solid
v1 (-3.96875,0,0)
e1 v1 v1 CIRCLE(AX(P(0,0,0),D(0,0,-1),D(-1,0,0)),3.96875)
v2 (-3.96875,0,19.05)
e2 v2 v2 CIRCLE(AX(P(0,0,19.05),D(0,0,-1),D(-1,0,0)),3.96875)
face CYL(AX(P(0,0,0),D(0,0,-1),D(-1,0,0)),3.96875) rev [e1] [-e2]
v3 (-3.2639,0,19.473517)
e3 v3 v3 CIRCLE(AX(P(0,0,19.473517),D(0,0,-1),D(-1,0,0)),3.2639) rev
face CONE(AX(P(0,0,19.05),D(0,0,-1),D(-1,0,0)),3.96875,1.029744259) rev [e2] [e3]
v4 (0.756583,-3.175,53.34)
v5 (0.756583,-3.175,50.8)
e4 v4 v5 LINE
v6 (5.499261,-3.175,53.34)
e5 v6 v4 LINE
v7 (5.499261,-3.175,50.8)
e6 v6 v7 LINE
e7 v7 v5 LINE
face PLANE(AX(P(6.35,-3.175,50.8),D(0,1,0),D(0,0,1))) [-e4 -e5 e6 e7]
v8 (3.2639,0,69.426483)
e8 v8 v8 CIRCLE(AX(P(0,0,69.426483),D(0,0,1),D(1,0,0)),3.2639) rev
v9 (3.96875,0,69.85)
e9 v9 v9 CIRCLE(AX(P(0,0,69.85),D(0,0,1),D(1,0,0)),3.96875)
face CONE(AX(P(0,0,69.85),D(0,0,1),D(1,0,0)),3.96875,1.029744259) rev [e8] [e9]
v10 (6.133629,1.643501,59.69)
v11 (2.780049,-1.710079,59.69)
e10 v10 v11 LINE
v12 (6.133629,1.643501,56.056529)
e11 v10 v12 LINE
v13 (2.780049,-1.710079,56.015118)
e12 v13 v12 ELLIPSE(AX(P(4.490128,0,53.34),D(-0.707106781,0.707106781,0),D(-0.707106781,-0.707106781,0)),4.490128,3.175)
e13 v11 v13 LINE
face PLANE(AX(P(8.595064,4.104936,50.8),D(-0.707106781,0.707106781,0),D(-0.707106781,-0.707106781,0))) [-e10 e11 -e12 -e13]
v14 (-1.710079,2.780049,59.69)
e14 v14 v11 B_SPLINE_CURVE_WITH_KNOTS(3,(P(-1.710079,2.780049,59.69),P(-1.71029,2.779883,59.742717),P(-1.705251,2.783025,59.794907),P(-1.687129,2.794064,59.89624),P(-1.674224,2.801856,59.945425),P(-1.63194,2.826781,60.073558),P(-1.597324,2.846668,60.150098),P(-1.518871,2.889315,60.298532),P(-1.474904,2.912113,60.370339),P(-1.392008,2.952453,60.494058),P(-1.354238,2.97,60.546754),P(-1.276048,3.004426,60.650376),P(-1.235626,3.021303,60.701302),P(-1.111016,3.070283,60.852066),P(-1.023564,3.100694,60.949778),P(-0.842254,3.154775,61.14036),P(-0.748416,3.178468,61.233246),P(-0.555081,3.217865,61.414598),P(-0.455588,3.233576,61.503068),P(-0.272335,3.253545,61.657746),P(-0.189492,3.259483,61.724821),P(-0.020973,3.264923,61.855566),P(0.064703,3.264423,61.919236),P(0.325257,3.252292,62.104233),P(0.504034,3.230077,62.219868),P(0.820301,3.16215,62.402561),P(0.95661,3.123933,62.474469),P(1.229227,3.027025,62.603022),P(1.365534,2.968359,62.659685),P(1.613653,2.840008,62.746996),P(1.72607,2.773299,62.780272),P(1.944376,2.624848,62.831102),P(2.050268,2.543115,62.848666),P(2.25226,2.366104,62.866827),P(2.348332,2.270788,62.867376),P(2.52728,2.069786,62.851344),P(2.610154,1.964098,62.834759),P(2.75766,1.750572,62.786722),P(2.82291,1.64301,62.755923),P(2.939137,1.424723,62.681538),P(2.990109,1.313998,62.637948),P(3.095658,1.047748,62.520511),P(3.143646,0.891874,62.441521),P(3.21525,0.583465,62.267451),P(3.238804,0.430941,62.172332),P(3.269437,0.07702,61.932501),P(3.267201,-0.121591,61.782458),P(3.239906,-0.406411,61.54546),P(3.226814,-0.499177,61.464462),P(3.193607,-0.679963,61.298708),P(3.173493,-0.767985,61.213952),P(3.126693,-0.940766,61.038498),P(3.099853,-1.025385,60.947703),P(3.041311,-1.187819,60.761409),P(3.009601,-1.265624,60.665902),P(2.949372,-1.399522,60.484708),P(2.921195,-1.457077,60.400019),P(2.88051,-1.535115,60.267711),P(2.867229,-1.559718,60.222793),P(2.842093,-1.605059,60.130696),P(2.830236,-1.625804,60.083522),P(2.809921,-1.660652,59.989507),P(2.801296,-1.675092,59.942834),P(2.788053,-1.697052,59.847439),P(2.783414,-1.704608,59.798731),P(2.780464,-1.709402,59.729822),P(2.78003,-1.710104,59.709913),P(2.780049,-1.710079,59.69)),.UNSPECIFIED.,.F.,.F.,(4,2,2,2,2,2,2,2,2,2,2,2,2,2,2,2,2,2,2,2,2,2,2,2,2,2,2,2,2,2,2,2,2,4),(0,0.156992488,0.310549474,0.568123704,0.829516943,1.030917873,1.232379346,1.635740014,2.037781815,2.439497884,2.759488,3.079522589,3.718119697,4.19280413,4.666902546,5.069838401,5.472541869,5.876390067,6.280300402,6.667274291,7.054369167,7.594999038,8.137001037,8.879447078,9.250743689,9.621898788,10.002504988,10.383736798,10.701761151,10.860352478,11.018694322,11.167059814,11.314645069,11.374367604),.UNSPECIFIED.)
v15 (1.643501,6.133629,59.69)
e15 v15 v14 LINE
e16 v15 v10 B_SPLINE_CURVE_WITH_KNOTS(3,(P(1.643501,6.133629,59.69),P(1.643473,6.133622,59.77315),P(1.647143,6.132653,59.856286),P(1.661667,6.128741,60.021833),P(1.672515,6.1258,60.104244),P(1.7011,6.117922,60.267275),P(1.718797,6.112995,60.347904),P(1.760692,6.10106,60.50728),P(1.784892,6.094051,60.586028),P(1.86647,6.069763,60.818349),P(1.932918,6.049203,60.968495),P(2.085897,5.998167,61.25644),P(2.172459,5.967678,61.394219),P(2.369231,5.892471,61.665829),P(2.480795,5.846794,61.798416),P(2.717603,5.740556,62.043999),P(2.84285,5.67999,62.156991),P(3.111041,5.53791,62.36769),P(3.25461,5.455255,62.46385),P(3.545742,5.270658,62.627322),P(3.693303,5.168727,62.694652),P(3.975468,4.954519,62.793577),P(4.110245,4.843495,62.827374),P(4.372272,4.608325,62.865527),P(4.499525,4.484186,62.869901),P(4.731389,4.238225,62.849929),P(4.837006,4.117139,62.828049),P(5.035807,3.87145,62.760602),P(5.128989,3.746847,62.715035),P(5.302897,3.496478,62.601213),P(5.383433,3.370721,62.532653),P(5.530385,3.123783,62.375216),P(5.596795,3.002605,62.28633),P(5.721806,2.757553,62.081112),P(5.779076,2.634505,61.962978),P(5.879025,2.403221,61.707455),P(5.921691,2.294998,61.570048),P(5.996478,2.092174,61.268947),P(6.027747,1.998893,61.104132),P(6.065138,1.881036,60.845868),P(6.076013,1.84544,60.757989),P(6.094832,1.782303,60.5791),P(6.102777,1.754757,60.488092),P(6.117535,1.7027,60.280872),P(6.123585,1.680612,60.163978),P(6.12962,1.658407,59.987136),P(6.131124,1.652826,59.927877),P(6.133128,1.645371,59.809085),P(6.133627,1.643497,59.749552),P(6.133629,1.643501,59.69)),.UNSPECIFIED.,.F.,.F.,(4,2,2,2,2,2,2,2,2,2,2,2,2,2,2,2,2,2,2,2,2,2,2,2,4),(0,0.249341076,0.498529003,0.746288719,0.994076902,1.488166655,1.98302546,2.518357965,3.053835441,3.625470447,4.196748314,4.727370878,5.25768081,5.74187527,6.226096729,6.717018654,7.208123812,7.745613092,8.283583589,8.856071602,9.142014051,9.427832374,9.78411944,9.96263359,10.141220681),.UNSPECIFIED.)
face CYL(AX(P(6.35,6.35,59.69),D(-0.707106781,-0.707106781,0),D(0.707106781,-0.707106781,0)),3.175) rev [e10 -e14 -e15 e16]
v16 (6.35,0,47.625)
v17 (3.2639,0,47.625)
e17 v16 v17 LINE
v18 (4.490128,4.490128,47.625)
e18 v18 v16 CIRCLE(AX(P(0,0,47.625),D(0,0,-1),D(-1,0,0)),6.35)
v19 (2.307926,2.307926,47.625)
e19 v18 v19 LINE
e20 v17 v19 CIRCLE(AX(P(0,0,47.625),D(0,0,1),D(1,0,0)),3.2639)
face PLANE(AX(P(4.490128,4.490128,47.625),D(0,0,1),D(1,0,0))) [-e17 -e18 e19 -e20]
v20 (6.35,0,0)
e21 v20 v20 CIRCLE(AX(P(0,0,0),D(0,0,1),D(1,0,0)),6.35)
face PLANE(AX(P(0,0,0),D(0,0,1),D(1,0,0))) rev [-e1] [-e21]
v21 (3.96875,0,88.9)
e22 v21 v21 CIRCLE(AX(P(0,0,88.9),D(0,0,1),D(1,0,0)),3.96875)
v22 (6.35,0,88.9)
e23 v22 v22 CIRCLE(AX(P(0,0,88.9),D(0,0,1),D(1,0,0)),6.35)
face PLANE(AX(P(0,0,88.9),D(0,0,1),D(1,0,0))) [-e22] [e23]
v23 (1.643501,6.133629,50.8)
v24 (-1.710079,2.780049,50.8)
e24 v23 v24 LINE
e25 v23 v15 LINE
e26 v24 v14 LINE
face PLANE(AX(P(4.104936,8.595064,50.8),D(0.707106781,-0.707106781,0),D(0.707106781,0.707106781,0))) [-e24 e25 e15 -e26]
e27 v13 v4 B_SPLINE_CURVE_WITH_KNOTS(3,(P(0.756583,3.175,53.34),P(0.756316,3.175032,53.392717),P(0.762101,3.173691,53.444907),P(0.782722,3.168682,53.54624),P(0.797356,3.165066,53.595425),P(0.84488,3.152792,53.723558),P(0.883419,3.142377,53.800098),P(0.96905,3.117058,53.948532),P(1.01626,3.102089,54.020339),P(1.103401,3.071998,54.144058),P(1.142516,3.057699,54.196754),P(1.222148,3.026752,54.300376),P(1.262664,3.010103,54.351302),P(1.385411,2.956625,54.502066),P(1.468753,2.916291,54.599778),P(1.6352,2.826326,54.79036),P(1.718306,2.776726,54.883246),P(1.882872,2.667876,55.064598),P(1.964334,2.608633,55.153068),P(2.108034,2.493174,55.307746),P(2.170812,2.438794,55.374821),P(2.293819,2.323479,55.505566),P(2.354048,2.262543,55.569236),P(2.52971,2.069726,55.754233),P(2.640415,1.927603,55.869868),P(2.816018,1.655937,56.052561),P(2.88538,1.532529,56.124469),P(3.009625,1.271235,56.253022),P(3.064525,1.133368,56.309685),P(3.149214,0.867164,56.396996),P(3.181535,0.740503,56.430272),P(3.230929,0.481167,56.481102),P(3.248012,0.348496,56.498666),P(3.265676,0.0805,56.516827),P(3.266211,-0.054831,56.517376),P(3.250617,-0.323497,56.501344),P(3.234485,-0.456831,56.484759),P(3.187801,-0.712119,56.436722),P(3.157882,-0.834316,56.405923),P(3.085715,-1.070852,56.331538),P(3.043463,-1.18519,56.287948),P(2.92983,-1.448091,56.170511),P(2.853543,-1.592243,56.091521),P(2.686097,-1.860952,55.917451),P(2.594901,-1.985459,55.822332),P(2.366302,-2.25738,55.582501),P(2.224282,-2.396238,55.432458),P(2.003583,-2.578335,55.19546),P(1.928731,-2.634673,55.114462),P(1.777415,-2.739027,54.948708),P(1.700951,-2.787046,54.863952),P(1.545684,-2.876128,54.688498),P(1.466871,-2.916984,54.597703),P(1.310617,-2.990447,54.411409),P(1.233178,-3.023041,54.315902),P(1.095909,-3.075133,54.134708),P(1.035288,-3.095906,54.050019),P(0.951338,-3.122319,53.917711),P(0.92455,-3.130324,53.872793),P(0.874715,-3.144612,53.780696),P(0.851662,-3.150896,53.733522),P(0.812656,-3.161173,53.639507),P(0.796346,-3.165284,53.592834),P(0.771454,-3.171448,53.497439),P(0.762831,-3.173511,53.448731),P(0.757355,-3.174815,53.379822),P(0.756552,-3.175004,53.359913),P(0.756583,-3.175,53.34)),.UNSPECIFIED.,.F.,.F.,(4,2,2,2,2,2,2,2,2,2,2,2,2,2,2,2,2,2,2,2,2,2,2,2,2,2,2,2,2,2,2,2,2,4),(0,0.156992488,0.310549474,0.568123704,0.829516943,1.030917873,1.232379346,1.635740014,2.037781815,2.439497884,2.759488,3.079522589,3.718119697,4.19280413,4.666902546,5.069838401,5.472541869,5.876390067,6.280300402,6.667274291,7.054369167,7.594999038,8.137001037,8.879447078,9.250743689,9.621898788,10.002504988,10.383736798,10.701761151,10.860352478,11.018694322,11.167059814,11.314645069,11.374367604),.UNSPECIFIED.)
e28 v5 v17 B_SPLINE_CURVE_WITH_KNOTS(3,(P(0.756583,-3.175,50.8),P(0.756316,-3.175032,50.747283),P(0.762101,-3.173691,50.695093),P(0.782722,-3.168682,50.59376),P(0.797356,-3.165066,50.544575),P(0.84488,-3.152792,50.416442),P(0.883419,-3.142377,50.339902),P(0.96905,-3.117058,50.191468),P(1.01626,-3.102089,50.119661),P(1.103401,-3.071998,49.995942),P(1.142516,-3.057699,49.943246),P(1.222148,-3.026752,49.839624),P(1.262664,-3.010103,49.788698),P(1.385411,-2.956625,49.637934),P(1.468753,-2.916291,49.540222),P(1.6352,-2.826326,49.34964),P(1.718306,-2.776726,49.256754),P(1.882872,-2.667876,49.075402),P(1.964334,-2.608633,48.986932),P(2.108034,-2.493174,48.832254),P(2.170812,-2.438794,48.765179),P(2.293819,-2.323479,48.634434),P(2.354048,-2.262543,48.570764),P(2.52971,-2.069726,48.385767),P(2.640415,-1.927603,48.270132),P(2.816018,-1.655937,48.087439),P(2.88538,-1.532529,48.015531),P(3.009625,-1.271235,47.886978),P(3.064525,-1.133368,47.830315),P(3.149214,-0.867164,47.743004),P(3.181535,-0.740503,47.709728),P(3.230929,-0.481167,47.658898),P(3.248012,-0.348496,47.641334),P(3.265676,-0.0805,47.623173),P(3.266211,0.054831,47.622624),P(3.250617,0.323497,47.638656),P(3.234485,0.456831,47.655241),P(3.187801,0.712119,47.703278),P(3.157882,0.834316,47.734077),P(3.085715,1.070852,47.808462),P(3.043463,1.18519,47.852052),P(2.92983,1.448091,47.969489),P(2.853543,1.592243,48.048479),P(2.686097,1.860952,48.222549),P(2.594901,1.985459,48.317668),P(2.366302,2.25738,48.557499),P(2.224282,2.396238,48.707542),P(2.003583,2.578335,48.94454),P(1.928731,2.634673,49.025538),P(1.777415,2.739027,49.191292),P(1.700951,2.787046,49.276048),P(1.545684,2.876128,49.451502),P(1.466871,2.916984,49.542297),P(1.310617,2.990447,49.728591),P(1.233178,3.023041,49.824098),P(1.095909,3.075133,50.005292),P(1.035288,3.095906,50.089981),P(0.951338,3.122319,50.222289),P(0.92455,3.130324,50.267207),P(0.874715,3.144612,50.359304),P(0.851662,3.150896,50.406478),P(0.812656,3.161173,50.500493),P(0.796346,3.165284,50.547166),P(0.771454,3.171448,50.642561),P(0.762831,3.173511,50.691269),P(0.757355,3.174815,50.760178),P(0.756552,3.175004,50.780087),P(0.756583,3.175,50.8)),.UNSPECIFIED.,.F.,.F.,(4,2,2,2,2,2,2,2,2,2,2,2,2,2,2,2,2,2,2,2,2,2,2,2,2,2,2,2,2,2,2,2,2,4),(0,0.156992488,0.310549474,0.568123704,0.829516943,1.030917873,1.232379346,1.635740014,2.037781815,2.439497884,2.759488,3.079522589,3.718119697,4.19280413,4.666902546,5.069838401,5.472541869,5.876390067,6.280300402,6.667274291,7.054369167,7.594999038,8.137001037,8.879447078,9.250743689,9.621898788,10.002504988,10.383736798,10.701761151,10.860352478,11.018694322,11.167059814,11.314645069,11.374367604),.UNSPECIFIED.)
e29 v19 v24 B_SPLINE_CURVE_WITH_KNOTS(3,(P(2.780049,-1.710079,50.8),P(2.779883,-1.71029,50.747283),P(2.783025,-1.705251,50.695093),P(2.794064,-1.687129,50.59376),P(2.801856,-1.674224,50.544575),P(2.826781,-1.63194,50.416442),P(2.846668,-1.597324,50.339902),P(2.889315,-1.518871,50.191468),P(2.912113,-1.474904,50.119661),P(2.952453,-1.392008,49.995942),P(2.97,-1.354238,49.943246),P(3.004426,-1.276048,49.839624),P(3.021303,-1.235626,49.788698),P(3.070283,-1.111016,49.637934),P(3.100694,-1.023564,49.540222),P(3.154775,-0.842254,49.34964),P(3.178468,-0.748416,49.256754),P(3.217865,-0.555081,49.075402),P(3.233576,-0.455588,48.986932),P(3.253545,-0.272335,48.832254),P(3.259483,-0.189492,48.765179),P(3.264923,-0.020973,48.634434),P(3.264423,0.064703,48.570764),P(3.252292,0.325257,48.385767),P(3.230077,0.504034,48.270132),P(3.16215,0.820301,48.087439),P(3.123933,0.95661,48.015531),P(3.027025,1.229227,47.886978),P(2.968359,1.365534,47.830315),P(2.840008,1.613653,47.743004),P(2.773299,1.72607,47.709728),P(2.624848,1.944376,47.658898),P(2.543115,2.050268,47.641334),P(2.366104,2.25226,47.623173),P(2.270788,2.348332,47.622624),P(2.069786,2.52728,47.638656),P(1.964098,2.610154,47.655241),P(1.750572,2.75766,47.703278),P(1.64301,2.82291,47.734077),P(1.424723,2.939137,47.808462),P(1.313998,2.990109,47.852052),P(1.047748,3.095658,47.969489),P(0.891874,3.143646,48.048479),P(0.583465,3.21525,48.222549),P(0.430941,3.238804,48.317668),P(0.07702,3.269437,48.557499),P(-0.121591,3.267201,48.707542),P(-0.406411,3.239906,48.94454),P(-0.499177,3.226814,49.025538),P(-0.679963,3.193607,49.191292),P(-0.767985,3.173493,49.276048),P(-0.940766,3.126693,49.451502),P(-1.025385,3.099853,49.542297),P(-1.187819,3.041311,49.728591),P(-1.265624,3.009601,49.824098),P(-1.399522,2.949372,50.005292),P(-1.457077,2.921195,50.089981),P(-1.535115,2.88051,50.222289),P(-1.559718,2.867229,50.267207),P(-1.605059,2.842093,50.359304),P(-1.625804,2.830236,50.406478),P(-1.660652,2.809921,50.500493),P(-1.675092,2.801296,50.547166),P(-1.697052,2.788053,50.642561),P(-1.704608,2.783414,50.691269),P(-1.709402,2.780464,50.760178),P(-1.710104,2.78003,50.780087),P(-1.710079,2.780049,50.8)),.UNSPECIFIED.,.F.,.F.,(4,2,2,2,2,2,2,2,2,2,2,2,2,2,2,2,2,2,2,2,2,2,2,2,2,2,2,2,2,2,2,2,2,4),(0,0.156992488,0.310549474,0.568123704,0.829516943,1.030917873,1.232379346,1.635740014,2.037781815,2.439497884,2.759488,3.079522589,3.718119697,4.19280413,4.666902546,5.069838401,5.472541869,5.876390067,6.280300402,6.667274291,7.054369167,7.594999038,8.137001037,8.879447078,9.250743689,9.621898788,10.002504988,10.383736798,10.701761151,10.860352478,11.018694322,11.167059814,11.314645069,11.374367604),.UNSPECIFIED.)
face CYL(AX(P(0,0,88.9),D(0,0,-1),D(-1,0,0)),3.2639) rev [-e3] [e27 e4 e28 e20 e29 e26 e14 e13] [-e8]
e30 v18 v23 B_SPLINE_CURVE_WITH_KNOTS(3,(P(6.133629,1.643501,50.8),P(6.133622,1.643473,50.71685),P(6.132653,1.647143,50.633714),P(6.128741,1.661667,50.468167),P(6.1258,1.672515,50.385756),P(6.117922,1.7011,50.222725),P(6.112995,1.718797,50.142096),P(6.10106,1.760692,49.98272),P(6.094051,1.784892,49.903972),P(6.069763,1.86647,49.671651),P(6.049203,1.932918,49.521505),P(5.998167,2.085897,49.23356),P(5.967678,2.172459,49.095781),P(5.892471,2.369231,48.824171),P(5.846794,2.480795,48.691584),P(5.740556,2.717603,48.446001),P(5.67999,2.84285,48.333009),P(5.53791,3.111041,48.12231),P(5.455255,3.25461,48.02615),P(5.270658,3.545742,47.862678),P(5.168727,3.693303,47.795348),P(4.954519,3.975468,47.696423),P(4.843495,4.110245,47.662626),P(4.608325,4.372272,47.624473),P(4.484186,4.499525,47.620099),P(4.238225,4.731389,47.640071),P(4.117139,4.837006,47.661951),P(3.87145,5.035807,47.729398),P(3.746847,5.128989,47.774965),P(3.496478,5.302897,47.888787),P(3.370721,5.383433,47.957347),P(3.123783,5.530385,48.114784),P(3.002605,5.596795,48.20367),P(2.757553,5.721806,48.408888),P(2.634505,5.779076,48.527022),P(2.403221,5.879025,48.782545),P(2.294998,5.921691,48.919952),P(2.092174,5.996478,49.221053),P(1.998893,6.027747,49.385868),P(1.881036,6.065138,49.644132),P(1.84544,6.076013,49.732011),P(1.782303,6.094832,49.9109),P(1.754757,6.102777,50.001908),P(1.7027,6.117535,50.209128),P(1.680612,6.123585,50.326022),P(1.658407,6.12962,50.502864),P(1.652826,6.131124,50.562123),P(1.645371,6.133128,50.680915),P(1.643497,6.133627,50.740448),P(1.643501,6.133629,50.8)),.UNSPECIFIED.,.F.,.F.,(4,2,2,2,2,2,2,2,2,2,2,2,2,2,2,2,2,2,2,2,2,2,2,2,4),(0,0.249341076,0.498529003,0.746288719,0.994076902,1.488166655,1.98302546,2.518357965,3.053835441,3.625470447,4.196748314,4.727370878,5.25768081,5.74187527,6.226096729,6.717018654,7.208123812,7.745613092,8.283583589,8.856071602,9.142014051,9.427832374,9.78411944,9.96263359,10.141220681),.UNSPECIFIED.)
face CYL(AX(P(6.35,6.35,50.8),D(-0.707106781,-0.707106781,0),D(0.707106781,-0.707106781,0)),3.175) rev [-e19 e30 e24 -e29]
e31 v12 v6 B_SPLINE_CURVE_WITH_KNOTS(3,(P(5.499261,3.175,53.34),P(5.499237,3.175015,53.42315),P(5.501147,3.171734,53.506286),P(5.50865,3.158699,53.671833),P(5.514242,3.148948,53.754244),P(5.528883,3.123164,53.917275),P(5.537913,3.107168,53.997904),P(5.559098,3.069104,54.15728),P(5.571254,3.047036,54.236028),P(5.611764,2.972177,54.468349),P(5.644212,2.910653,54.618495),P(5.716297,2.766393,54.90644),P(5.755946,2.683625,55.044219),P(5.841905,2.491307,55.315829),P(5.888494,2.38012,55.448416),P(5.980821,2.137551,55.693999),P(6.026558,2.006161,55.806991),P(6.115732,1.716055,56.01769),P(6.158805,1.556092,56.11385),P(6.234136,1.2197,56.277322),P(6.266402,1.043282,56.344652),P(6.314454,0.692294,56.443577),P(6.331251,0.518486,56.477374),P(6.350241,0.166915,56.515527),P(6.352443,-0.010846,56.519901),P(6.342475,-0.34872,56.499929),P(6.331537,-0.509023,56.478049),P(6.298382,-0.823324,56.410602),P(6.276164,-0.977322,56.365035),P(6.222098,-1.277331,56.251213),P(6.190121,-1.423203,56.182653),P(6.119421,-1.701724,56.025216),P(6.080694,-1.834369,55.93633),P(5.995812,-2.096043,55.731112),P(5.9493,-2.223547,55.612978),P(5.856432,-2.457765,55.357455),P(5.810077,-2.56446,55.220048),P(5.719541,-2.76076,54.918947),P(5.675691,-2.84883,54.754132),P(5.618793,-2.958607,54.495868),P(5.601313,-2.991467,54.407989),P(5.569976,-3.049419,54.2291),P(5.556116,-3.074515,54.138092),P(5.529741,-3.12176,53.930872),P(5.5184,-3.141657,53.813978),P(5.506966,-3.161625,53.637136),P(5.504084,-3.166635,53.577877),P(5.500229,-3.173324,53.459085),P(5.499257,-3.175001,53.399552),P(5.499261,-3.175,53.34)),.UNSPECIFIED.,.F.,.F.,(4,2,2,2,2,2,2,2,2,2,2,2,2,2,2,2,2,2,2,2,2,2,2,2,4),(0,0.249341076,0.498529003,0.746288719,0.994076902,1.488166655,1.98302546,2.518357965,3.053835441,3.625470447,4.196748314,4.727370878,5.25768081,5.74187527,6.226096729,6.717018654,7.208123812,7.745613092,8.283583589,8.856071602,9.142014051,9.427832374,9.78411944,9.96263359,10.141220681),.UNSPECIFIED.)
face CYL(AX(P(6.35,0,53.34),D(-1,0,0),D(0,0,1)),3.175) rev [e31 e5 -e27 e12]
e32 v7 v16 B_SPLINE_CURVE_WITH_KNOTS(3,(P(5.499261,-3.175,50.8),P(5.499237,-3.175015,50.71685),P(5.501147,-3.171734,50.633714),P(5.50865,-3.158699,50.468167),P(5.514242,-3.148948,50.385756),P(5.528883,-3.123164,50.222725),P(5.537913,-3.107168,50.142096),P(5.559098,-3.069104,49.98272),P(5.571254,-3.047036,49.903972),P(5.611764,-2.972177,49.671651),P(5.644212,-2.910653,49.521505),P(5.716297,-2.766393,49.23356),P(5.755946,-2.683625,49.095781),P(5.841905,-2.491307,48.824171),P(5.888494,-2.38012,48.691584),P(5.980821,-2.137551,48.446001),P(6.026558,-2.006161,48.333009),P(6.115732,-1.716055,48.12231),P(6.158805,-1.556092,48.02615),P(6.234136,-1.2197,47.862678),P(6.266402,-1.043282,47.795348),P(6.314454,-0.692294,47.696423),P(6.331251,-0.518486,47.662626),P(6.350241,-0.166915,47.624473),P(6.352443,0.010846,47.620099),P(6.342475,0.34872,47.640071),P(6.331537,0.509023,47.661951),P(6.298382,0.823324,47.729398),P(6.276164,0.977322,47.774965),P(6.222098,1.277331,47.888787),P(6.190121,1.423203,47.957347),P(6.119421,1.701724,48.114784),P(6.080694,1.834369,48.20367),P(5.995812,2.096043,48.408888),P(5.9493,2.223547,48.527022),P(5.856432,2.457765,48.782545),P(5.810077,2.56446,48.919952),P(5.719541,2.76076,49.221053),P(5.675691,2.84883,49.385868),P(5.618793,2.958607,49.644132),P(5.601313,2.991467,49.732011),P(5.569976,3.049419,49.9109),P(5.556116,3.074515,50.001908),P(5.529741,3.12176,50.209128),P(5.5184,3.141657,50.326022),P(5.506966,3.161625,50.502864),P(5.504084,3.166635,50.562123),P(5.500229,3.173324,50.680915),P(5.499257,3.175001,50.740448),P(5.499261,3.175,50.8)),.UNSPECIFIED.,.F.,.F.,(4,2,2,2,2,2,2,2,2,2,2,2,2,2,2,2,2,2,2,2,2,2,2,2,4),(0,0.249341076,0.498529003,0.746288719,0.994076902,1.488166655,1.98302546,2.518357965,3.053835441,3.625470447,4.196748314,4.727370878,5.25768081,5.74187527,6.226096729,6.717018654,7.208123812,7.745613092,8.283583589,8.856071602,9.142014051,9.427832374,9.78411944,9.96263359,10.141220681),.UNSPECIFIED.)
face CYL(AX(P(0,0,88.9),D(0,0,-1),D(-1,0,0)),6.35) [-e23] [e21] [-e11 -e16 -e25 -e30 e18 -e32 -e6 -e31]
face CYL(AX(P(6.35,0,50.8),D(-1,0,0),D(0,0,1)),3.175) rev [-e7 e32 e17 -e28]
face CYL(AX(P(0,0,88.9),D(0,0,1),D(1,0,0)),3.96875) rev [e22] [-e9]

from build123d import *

# Parameters (mm, degrees)
SKETCH1_R           = 6.35
SKETCH1_R_2         = 3.2639
BOSS_EXTRUDE1_DEPTH = 88.9
CUT_EXTRUDE2_DEPTH  = 90.352420225
CUT_EXTRUDE3_DEPTH  = 90.352420338
SKETCH75_W          = 6.35
SKETCH75_H          = 6.35
CUT_REVOLVE1_ANGLE  = 45


# Read off the part's stored shape, not the designer's step: 3/8-16 Tapped Hole3
with BuildPart() as part:
    # Sketch1 → Boss-Extrude1 (new body)
    with BuildSketch(Plane.XY):
        Circle(SKETCH1_R)
        Circle(SKETCH1_R_2, mode=Mode.SUBTRACT)
    extrude(amount=BOSS_EXTRUDE1_DEPTH)

    # 3/8-16 Tapped Hole3 outline → 3/8-16 Tapped Hole3 (revolve, cut)
    with BuildSketch(Plane.XZ):
        Polygon((3.2639, 88.9), (3.2639, 69.426483393), (3.96875, 69.85), (3.96875, 88.9), align=None)
        Polygon((3.96875, 19.05), (3.2639, 19.473516607), (3.2639, 0), (3.96875, 0), align=None)
    revolve(axis=Axis((0, 0, 0), (0, 0, 1)), mode=Mode.SUBTRACT)

    # Sketch13 → Cut-Extrude2 (cut, through all)
    with BuildSketch(Plane(origin=(0, 0, 0), x_dir=(0, 0, -1), z_dir=(1, 0, 0))):
        with BuildLine():
            Line((-50.8, -3.175), (-53.34, -3.175))
            ThreePointArc((-53.34, -3.175), (-56.515, 0), (-53.34, 3.175))
            Line((-53.34, 3.175), (-50.8, 3.175))
            ThreePointArc((-50.8, 3.175), (-47.625, 0), (-50.8, -3.175))
        make_face()
    extrude(amount=CUT_EXTRUDE2_DEPTH, mode=Mode.SUBTRACT)

    # Sketch52 → Cut-Extrude3 (cut, through all)
    with BuildSketch(Plane(origin=(0, 0, 0), x_dir=(0.7071067811865491, -0.7071067811865461, 0), z_dir=(0.7071067811865461, 0.7071067811865491, 0))):
        with BuildLine():
            Line((3.175, -50.8), (3.175, -59.69))
            ThreePointArc((3.175, -59.69), (0, -62.865), (-3.175, -59.69))
            Line((-3.175, -59.69), (-3.175, -50.8))
            ThreePointArc((-3.175, -50.8), (0, -47.625), (3.175, -50.8))
        make_face()
    extrude(amount=CUT_EXTRUDE3_DEPTH, mode=Mode.SUBTRACT)

    # Sketch75 → Cut-Revolve1 (revolve, cut)
    with BuildSketch(Plane(origin=(0, 0, 0), x_dir=(1, 0, 0), z_dir=(0, 1, 0))):
        with Locations((3.175, -50.8)):
            Rectangle(SKETCH75_W, SKETCH75_H)
    revolve(axis=Axis((0, 0, 0), (0, 0, 1)), revolution_arc=CUT_REVOLVE1_ANGLE, mode=Mode.SUBTRACT)


solid = part.part
